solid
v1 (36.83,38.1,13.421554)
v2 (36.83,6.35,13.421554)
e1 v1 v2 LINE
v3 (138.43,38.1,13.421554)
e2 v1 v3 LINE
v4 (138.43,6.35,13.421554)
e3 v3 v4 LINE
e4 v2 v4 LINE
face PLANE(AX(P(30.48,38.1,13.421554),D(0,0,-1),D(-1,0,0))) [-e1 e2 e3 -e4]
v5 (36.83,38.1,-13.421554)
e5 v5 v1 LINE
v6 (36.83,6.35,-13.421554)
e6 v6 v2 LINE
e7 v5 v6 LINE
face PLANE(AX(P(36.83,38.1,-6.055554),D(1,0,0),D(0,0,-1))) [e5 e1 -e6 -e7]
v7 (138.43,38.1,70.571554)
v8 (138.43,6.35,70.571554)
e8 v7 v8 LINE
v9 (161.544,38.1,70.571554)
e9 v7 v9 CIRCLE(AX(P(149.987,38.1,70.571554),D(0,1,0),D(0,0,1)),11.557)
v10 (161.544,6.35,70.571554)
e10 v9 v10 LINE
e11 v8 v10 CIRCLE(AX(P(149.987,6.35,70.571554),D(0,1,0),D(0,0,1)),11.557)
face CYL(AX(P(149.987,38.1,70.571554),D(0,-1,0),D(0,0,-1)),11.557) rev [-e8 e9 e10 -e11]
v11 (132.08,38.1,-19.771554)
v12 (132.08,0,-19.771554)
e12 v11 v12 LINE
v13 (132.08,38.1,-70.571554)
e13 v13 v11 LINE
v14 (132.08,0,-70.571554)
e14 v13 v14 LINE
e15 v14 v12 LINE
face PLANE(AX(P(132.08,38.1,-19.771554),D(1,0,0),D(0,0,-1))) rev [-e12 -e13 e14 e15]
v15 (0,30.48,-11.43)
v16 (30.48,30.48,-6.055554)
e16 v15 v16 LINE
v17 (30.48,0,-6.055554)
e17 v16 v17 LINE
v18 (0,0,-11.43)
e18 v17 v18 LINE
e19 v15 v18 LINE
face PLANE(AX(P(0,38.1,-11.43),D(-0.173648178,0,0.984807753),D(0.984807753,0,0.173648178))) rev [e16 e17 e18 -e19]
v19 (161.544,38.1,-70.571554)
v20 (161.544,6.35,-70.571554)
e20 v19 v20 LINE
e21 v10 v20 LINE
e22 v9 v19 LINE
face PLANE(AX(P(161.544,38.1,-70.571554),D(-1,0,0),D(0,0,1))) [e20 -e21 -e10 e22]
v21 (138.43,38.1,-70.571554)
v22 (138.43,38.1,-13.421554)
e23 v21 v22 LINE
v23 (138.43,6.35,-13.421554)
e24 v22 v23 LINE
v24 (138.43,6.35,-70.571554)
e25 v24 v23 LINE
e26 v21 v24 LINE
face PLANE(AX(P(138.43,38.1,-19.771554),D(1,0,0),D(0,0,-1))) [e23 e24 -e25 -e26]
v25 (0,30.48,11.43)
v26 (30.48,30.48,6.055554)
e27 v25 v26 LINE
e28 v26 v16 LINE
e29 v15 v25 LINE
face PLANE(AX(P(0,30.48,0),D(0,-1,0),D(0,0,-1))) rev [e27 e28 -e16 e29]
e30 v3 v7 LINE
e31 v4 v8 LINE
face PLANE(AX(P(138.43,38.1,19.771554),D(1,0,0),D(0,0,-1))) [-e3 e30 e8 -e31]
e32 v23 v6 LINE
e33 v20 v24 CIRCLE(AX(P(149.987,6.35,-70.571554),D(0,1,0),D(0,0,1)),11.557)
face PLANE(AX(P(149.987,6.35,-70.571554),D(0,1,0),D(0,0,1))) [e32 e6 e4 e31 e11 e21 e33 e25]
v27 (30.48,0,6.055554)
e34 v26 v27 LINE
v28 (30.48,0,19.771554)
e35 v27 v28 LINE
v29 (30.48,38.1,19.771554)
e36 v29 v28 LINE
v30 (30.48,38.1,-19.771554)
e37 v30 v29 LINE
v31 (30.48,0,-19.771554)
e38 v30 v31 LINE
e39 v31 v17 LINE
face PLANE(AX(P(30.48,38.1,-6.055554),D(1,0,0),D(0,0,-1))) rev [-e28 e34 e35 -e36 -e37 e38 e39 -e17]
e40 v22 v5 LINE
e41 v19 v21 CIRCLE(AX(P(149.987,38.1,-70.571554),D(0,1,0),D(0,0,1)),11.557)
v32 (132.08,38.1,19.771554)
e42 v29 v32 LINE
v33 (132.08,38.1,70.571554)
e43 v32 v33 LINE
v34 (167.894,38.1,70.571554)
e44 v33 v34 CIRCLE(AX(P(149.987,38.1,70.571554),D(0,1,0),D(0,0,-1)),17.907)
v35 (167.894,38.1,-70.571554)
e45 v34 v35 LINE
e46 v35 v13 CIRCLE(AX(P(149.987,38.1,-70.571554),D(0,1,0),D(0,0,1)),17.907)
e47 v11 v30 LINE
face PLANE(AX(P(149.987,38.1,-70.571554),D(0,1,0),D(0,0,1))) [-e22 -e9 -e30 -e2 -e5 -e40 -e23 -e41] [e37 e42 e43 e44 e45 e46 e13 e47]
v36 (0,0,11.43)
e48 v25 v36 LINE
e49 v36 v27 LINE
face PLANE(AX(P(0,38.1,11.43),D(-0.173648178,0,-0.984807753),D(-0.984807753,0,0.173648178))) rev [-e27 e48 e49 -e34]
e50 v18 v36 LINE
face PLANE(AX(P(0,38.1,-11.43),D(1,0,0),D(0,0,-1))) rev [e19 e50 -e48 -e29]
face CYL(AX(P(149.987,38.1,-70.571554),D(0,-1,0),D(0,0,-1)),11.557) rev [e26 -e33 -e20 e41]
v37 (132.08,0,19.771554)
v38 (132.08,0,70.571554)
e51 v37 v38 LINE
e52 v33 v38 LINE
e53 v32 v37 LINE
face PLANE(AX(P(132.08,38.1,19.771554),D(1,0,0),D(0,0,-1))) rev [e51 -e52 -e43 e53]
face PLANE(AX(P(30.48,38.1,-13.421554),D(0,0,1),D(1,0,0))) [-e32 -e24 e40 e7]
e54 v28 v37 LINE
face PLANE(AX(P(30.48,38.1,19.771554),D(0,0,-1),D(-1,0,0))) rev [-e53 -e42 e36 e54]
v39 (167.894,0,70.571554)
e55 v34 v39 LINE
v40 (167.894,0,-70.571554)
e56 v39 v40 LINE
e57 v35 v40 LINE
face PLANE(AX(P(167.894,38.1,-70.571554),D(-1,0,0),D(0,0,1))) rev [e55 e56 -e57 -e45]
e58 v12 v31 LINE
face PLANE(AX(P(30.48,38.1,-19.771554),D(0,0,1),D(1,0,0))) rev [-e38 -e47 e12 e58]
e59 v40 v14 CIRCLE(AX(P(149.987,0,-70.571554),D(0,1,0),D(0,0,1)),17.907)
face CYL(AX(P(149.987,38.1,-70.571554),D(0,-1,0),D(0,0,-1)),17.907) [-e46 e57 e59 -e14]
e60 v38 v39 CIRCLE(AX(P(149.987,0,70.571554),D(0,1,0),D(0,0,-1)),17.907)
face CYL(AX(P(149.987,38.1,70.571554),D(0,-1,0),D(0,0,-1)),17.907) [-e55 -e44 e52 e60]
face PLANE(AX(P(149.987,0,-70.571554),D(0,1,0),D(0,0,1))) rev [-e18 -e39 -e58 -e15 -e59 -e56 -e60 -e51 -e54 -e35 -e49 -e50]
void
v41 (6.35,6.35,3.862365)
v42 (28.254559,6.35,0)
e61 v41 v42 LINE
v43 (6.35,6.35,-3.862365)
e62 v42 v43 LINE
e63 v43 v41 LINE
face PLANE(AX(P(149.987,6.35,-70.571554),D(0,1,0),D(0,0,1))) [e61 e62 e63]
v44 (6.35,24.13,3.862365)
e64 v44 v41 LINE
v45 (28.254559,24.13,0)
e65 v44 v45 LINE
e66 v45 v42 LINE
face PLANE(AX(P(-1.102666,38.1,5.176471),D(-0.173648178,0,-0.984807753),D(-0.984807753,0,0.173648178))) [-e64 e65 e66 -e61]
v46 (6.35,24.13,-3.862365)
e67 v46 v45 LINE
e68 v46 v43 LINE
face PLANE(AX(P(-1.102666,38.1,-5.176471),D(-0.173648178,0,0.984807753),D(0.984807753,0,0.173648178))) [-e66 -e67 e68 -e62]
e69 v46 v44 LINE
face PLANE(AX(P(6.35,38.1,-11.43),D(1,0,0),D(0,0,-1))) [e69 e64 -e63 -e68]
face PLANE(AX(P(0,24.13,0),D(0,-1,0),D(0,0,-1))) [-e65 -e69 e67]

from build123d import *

# Parameters (mm, degrees)
BOSS_EXTRUDE1_DEPTH = 38.1
CUT_EXTRUDE10_DEPTH = 7.62
SHELL2_START        = 6.35
SHELL2_DEPTH        = 31.75
SHELL2_2_DEPTH      = 17.78


# Read off the part's stored shape, not the designer's step: Shell2
with BuildPart() as part:
    # Sketch1 → Boss-Extrude1 (new body)
    with BuildSketch(Plane(origin=(0, 0, 0), x_dir=(1, 0, 0), z_dir=(0, 1, 0))):
        with BuildLine():
            Line((0, 11.43), (0, -11.43))
            Line((0, -11.43), (30.48, -6.055553628))
            Line((30.48, -6.055553628), (30.48, -19.771553628))
            Line((30.48, -19.771553628), (132.08, -19.771553628))
            Line((132.08, -19.771553628), (132.08, -70.571553628))
            ThreePointArc((132.08, -70.571553628), (149.987, -88.478553628), (167.894, -70.571553628))
            Line((167.894, -70.571553628), (167.894, 70.571553628))
            ThreePointArc((167.894, 70.571553628), (149.987, 88.478553628), (132.08, 70.571553628))
            Line((132.08, 70.571553628), (132.08, 19.771553628))
            Line((132.08, 19.771553628), (30.48, 19.771553628))
            Line((30.48, 19.771553628), (30.48, 6.055553628))
            Line((30.48, 6.055553628), (0, 11.43))
        make_face()
    extrude(amount=BOSS_EXTRUDE1_DEPTH)

    # Sketch5 → Cut-Extrude10 (cut)
    with BuildSketch(Plane(origin=(0, 38.1, 0), x_dir=(1, 0, 0), z_dir=(0, 1, 0))):
        Polygon((0, -11.43), (0, 11.43), (0.205611809, 11.576348711), (30.48, 6.055553628), (30.48, -6.055553628), align=None)
    extrude(amount=-CUT_EXTRUDE10_DEPTH, mode=Mode.SUBTRACT)

    # Shell2 outline → Shell2 (cut)
    with BuildSketch(Plane(origin=(0, 0, 0), x_dir=(1, 0, 0), z_dir=(0, 1, 0)).offset(SHELL2_START)):
        with BuildLine():
            Line((36.83, 13.421553628), (36.83, -13.421553628))
            Line((36.83, -13.421553628), (138.43, -13.421553628))
            Line((138.43, -13.421553628), (138.43, -70.571553628))
            ThreePointArc((138.43, -70.571553628), (149.987, -82.128553628), (161.544, -70.571553628))
            Line((161.544, -70.571553628), (161.544, 70.571553628))
            ThreePointArc((161.544, 70.571553628), (149.987, 82.128553628), (138.43, 70.571553628))
            Line((138.43, 70.571553628), (138.43, 13.421553628))
            Line((138.43, 13.421553628), (36.83, 13.421553628))
        make_face()
    extrude(amount=SHELL2_DEPTH, mode=Mode.SUBTRACT)

    # Shell2 2 outline → Shell2 2 (cut)
    with BuildSketch(Plane(origin=(0, 0, 0), x_dir=(1, 0, 0), z_dir=(0, 1, 0)).offset(SHELL2_START)):
        Polygon((28.25455863, 0), (6.35, 3.862364687), (6.35, -3.862364687), align=None)
    extrude(amount=SHELL2_2_DEPTH, mode=Mode.SUBTRACT)


solid = part.part
